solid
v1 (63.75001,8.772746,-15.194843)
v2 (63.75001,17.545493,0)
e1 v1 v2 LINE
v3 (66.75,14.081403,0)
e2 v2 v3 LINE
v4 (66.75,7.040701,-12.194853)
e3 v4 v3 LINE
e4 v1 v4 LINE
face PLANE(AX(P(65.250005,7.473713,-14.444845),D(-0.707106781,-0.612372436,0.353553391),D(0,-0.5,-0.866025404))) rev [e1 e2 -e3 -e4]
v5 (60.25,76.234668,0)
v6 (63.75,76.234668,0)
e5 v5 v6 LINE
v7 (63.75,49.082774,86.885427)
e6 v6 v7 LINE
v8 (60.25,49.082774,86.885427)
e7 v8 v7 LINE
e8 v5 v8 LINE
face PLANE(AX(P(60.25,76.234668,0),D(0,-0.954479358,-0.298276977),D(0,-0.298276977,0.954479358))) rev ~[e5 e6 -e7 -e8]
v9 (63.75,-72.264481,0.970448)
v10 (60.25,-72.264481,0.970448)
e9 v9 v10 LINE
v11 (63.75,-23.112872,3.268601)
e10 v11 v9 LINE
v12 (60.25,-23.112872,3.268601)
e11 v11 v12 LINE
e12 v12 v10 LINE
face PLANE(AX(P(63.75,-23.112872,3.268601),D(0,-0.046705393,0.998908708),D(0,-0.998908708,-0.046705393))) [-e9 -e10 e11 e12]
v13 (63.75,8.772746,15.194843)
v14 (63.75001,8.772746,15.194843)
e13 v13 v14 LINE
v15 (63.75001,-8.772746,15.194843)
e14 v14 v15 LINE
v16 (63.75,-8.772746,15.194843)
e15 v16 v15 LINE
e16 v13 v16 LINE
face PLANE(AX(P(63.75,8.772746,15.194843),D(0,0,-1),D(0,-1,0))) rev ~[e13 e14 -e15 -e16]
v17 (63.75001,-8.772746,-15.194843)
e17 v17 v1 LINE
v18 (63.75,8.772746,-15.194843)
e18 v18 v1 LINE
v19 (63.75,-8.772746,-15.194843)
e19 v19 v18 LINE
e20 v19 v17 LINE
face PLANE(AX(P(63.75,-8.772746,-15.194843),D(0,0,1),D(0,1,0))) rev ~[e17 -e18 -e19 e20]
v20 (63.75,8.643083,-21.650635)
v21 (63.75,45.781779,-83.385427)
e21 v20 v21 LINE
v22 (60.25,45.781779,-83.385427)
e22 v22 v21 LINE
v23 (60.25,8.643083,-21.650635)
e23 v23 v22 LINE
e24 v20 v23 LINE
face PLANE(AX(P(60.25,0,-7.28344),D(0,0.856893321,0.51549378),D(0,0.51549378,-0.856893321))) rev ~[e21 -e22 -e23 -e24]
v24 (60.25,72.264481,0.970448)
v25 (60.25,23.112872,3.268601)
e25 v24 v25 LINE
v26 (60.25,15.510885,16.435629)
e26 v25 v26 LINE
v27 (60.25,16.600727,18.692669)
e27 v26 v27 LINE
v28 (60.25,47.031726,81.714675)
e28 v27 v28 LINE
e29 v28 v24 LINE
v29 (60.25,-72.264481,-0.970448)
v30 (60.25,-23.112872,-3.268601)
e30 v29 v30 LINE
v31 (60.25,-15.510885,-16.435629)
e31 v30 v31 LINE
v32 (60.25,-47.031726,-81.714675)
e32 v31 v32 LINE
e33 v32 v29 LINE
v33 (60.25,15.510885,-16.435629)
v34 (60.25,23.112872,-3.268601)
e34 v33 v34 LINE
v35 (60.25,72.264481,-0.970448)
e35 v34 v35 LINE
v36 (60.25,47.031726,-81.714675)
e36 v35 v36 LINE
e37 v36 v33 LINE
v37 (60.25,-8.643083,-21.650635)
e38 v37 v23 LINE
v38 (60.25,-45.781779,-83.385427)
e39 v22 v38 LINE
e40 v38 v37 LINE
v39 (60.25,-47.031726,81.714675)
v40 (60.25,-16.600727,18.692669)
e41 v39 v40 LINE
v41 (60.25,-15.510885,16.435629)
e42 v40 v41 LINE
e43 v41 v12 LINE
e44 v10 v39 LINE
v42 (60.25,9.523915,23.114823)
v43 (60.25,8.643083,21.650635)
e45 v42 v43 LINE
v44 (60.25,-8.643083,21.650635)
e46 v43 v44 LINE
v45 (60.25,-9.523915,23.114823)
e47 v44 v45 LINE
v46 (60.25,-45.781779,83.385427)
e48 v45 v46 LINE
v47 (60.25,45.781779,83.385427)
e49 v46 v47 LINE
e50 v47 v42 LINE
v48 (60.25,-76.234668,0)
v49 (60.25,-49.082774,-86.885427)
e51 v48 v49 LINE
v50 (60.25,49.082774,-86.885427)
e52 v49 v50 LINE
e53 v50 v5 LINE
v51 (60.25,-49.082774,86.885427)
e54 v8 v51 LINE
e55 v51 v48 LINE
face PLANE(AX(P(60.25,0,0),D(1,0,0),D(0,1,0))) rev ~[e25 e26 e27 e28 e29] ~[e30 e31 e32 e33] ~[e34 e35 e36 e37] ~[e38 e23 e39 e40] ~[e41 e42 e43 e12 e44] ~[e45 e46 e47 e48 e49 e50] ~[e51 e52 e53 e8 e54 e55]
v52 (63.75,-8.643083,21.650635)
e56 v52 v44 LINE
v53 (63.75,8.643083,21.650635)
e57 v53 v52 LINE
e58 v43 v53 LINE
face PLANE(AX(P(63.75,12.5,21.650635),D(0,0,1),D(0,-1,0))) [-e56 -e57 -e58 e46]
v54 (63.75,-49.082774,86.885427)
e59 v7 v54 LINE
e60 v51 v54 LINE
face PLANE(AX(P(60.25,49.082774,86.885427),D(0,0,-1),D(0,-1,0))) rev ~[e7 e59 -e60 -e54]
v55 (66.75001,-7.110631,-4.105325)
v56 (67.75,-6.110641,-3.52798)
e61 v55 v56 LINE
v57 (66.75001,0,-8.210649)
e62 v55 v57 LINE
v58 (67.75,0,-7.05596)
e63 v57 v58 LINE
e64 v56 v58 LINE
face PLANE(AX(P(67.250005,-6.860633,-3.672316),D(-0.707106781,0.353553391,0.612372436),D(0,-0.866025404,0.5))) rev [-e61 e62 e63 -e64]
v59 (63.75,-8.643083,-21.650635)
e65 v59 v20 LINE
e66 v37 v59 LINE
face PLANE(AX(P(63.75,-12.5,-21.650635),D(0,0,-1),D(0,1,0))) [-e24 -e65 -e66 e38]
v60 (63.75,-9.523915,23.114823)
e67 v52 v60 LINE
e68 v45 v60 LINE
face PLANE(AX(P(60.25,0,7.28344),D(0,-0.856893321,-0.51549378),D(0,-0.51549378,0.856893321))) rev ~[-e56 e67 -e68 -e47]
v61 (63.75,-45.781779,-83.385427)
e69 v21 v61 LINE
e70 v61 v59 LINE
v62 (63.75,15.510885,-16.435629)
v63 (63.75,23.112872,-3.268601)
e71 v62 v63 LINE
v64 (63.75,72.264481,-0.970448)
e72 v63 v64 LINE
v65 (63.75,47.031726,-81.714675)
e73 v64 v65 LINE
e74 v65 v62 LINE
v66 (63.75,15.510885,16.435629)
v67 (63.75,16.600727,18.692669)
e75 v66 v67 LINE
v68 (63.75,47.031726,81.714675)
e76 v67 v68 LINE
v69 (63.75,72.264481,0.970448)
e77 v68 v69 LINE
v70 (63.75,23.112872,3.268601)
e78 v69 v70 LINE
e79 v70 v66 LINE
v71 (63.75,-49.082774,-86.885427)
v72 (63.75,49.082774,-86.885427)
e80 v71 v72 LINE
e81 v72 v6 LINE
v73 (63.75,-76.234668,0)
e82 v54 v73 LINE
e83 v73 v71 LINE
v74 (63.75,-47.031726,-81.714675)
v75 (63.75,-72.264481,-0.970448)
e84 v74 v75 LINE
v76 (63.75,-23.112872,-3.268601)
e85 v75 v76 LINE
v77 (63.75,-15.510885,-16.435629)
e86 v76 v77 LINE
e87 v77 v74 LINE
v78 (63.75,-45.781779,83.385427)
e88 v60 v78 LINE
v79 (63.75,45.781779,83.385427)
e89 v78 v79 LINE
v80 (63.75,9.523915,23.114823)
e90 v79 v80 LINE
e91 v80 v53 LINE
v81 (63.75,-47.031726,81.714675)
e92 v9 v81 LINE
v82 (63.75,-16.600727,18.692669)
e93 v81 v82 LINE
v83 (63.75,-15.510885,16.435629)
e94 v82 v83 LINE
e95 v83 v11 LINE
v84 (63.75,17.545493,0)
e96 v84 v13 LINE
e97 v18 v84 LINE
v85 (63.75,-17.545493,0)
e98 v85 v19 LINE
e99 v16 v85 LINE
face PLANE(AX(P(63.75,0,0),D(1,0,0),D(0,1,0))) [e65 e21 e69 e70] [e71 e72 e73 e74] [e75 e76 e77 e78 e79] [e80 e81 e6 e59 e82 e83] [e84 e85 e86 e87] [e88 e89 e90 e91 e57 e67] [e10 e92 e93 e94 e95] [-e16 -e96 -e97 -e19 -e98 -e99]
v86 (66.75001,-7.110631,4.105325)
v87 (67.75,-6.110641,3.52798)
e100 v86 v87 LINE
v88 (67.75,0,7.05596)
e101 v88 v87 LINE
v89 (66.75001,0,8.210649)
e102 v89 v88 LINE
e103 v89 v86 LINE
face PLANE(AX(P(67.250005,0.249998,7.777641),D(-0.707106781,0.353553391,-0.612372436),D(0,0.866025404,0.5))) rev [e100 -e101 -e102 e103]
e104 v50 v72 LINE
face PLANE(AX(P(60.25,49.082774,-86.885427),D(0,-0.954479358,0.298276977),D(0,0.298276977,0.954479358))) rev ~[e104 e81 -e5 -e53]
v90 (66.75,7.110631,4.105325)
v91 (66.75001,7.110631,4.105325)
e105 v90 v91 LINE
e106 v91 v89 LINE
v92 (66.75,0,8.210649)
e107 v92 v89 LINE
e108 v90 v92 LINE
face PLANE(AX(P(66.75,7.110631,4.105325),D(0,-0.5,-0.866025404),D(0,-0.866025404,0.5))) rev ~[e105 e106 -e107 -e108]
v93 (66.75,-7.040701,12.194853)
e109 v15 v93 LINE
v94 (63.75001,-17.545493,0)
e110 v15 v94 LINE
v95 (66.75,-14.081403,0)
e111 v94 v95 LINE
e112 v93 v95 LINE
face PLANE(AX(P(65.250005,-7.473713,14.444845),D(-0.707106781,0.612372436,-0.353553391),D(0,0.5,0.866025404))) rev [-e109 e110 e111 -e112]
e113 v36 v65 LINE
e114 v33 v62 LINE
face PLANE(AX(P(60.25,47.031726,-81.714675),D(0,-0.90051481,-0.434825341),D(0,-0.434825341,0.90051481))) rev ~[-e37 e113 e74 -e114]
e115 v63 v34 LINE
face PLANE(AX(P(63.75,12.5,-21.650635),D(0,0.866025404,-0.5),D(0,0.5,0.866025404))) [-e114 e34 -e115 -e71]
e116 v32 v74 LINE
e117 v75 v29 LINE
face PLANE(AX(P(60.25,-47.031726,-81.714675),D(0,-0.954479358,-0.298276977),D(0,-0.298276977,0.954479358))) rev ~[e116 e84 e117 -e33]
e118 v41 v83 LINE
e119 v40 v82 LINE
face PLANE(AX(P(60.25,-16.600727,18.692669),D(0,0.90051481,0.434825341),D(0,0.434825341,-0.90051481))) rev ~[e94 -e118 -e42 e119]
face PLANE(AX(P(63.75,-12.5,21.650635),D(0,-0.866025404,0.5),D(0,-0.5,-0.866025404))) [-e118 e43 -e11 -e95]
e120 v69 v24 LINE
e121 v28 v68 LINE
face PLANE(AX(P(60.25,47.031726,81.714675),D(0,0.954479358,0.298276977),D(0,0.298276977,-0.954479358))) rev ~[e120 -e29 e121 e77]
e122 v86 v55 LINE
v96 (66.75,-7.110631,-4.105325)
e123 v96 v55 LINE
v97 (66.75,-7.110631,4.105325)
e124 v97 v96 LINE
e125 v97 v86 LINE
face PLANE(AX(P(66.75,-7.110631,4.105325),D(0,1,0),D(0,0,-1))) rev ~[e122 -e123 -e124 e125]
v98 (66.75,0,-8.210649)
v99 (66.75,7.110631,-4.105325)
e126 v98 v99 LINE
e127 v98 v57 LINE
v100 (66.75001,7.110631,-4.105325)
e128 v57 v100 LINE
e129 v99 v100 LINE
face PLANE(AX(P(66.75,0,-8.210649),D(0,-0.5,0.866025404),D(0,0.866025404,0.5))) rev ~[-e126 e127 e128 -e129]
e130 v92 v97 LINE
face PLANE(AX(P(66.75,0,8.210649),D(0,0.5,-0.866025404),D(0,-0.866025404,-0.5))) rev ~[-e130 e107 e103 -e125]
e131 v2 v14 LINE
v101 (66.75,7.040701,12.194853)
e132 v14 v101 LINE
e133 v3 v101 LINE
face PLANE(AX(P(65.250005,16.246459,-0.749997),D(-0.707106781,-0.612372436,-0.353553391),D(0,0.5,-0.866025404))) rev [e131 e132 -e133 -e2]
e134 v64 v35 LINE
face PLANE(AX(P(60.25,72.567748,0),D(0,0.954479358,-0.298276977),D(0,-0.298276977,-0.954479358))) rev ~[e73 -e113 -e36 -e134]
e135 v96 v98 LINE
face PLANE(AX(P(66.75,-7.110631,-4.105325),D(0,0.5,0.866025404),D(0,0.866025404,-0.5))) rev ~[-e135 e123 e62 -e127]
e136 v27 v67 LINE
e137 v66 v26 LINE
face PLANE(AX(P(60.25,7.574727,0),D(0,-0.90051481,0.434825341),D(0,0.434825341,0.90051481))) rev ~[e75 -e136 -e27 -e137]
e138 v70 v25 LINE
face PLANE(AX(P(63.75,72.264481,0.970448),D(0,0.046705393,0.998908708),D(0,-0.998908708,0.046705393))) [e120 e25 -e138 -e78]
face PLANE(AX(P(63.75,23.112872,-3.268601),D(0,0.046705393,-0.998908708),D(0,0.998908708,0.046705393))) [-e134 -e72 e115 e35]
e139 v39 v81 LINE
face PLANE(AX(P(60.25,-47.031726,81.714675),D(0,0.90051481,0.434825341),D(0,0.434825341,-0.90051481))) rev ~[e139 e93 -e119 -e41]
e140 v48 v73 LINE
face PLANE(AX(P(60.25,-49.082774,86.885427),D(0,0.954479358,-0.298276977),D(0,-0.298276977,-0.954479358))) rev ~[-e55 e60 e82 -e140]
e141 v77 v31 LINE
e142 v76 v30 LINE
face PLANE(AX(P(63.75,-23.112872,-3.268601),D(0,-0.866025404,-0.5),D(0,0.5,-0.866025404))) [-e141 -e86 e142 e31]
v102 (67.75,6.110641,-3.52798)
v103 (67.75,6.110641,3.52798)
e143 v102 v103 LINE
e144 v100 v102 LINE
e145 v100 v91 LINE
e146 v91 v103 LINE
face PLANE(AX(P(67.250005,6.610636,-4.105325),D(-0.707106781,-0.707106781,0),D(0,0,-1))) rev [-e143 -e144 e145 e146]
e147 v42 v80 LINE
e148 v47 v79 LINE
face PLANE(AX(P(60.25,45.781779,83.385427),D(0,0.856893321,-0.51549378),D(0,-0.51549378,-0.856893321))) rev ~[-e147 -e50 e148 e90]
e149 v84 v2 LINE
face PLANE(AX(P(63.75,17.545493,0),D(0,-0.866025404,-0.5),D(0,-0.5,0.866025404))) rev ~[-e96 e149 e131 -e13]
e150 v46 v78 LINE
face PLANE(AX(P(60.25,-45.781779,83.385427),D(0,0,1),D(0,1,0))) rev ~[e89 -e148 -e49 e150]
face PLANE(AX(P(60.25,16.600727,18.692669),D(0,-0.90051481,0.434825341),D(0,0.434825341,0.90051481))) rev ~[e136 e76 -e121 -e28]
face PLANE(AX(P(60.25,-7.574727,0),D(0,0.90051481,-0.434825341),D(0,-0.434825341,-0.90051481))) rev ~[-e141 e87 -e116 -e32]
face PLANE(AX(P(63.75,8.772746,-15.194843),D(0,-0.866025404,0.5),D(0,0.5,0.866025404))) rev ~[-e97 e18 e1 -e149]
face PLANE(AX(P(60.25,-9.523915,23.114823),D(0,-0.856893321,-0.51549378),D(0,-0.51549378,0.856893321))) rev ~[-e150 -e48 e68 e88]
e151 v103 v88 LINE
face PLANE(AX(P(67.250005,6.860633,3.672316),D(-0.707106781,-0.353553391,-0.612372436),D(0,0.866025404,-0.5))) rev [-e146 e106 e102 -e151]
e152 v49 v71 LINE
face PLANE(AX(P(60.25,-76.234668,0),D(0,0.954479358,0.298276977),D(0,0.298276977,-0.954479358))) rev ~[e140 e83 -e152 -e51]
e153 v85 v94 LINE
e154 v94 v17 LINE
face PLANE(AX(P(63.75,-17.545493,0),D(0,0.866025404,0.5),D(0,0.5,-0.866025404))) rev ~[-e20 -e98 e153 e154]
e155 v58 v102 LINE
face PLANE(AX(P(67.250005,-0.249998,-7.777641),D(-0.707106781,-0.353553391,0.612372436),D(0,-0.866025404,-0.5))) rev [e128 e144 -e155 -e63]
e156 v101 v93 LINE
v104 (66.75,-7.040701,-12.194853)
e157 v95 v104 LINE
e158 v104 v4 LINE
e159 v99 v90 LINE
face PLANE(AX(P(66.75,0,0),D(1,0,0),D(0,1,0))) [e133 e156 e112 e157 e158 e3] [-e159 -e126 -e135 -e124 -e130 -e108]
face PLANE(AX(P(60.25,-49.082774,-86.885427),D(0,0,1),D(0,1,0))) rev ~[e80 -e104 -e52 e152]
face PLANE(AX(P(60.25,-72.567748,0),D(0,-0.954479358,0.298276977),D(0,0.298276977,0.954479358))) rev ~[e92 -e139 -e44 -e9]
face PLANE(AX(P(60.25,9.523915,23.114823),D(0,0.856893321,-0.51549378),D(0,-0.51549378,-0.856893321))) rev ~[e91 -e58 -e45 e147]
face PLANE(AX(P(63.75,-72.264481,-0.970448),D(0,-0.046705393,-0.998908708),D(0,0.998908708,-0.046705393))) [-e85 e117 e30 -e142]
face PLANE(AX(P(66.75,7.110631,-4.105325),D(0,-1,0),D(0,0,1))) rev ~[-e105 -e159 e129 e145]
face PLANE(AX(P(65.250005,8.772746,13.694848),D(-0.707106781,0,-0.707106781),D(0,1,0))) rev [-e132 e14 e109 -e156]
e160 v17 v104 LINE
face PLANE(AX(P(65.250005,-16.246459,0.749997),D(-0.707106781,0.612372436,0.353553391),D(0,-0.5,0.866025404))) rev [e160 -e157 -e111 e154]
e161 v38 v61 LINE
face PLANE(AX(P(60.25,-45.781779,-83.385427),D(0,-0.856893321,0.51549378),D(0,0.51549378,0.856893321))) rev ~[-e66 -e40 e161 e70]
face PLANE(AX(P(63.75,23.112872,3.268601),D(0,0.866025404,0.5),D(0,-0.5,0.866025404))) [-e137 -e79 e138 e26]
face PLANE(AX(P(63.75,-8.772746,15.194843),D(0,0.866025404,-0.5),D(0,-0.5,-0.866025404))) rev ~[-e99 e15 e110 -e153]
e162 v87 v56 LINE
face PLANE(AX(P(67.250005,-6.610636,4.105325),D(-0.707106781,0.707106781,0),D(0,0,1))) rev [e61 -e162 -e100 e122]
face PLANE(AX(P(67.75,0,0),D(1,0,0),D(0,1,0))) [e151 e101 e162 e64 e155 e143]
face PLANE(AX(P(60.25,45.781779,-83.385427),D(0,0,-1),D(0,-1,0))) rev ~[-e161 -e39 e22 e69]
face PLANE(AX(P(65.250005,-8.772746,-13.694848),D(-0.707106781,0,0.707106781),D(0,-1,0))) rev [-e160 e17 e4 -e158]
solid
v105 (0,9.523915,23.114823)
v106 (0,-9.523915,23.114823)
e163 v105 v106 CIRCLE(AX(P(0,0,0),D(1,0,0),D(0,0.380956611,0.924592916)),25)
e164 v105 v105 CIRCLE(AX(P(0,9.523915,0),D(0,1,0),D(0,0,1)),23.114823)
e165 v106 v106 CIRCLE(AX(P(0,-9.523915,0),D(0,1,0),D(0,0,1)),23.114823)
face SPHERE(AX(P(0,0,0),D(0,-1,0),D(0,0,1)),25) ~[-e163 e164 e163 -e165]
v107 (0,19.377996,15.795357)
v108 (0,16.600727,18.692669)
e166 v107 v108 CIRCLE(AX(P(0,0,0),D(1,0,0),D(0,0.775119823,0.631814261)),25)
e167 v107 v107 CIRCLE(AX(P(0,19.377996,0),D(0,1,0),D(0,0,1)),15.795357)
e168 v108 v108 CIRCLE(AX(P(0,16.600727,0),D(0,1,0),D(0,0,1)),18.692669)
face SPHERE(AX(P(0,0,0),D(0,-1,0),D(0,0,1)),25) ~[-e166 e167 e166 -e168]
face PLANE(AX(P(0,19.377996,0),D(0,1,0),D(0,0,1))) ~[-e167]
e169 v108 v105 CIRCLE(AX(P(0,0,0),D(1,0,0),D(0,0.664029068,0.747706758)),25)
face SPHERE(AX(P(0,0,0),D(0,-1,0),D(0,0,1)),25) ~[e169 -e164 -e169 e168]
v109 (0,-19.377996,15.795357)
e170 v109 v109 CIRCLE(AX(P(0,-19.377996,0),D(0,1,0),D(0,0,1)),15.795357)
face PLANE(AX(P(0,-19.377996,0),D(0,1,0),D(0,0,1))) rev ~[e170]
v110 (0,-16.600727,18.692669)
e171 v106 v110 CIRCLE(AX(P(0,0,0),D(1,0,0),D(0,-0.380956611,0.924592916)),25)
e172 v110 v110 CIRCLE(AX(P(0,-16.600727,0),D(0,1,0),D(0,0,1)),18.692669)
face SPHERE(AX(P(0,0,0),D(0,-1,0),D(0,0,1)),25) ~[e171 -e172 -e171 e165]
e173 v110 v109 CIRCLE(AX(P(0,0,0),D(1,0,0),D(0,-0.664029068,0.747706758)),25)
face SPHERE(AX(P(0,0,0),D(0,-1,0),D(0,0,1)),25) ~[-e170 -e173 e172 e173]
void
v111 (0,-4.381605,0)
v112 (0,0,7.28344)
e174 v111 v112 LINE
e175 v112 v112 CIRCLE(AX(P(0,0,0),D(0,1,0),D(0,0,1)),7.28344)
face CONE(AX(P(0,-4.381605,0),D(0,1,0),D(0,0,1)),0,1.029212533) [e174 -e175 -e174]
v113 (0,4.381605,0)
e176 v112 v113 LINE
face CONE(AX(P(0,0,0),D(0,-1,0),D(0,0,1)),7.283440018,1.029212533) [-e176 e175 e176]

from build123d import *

# Parameters (mm, degrees)
F2_START = 60.25
F2_DEPTH = 3.5
F4_DEPTH = 3.5
F6_DEPTH = 3
F7_SIZE  = 2.99999
F9_DEPTH = 1
F10_SIZE = 0.99999


# Not quite as in the source:
# - a fillet or chamfer is up to 0.001 mm smaller than in the source, because OpenCascade refuses the exact size
# - a feature names something its author has since deleted; it is built from what else it names


with BuildPart() as f1:
    # F0 (on Right) → F1 (revolve)
    with BuildSketch(Plane.YZ):
        with BuildLine():
            ThreePointArc((-16.6007267077, 18.6926689581), (-18.0475959302, 17.2998347143), (-19.3779955618, 15.795356533))
            Line((-19.3779955618, 15.795356533), (-19.3779955618, 0))
            Line((-19.3779955618, 0), (-7.5747272931, 0))
            Line((-7.5747272931, 0), (-16.6007267077, 18.6926689581))
        make_face()
        with BuildLine():
            ThreePointArc((-9.5239152868, 23.1148228981), (-13.2481353859, 21.2011063107), (-16.6007267077, 18.6926689581))
            Line((-16.6007267077, 18.6926689581), (-7.5747272931, 0))
            Line((-7.5747272931, 0), (-4.3816049583, 0))
            Line((-4.3816049583, 0), (0, 7.2834400177))
            Line((0, 7.2834400177), (-9.5239152868, 23.1148228981))
        make_face()
        with BuildLine():
            ThreePointArc((9.5239152868, 23.1148228981), (0, 25), (-9.5239152868, 23.1148228981))
            Line((-9.5239152868, 23.1148228981), (0, 7.2834400177))
            Line((0, 7.2834400177), (9.5239152868, 23.1148228981))
        make_face()
        with BuildLine():
            ThreePointArc((16.6007267077, 18.6926689581), (13.2481353859, 21.2011063107), (9.5239152868, 23.1148228981))
            Line((9.5239152868, 23.1148228981), (0, 7.2834400177))
            Line((0, 7.2834400177), (4.3816049583, 0))
            Line((4.3816049583, 0), (7.5747272931, 0))
            Line((7.5747272931, 0), (16.6007267077, 18.6926689581))
        make_face()
        with BuildLine():
            ThreePointArc((19.3779955618, 15.795356533), (18.0475959302, 17.2998347143), (16.6007267077, 18.6926689581))
            Line((16.6007267077, 18.6926689581), (7.5747272931, 0))
            Line((7.5747272931, 0), (19.3779955618, 0))
            Line((19.3779955618, 0), (19.3779955618, 15.795356533))
        make_face()
    revolve(axis=Axis((0, 9.6889977809, 0), (0, 1, 0)))


with BuildPart() as f2:
    # F0 (on Right) → F2 (new body)
    with BuildSketch(Plane.YZ.offset(F2_START)):
        Polygon((49.0827742896, 86.8854269893), (0, 86.8854269893), (-49.0827742896, 86.8854269893), (-76.2346684933, 0), (-49.0827742896, -86.8854269893), (0, -86.8854269893), (49.0827742896, -86.8854269893), (76.2346684933, 0), align=None)
        Polygon((-45.7817793022, -83.3854269893), (0, -7.2834400177), (45.7817793022, -83.3854269893), (0, -83.3854269893), align=None, mode=Mode.SUBTRACT)
        with BuildLine():
            Line((-47.0317255702, 81.7146747964), (-16.6007267077, 18.6926689581))
            ThreePointArc((-16.6007267077, 18.6926689581), (-13.2481353859, 21.2011063107), (-9.5239152868, 23.1148228981))
            Line((-9.5239152868, 23.1148228981), (-45.7817793022, 83.3854269893))
            Line((-45.7817793022, 83.3854269893), (0, 83.3854269893))
            Line((0, 83.3854269893), (45.7817793022, 83.3854269893))
            Line((45.7817793022, 83.3854269893), (9.5239152868, 23.1148228981))
            ThreePointArc((9.5239152868, 23.1148228981), (13.2481353859, 21.2011063107), (16.6007267077, 18.6926689581))
            Line((16.6007267077, 18.6926689581), (47.0317255702, 81.7146747964))
            Line((47.0317255702, 81.7146747964), (72.5677479141, 0))
            Line((72.5677479141, 0), (47.0317255702, -81.7146747964))
            Line((47.0317255702, -81.7146747964), (7.5747272931, 0))
            Line((7.5747272931, 0), (4.3816049583, 0))
            Line((4.3816049583, 0), (0, -7.2834400177))
            Line((0, -7.2834400177), (-4.3816049583, 0))
            Line((-4.3816049583, 0), (-7.5747272931, 0))
            Line((-7.5747272931, 0), (-47.0317255702, -81.7146747964))
            Line((-47.0317255702, -81.7146747964), (-72.5677479141, 0))
            Line((-72.5677479141, 0), (-47.0317255702, 81.7146747964))
        make_face(mode=Mode.SUBTRACT)
        with BuildLine():
            ThreePointArc((-9.5239152868, 23.1148228981), (-13.2481353859, 21.2011063107), (-16.6007267077, 18.6926689581))
            Line((-16.6007267077, 18.6926689581), (-7.5747272931, 0))
            Line((-7.5747272931, 0), (-4.3816049583, 0))
            Line((-4.3816049583, 0), (0, 7.2834400177))
            Line((0, 7.2834400177), (-9.5239152868, 23.1148228981))
        make_face()
        with BuildLine():
            ThreePointArc((16.6007267077, 18.6926689581), (13.2481353859, 21.2011063107), (9.5239152868, 23.1148228981))
            Line((9.5239152868, 23.1148228981), (0, 7.2834400177))
            Line((0, 7.2834400177), (4.3816049583, 0))
            Line((4.3816049583, 0), (7.5747272931, 0))
            Line((7.5747272931, 0), (16.6007267077, 18.6926689581))
        make_face()
        Polygon((0, 7.2834400177), (-4.3816049583, 0), (0, 0), (4.3816049583, 0), align=None)
        Polygon((0, 0), (-4.3816049583, 0), (0, -7.2834400177), (4.3816049583, 0), align=None)
    extrude(amount=F2_DEPTH)

    # F3 (on face) → F4 (join, through all)
    with BuildSketch(Plane.YZ.offset(63.75)):
        Polygon((23.1128721452, -3.2686013249), (25, 0), (23.1128721452, 3.2686013249), (0, 4.3492764235), (-23.1128721452, 3.2686013249), (-25, 0), (-23.1128721452, -3.2686013249), (0, -4.3492764235), align=None)
        Polygon((12.5, -21.6506350946), (23.1128721452, -3.2686013249), (0, -4.3492764235), (-23.1128721452, -3.2686013249), (-12.5, -21.6506350946), align=None)
        Polygon((0, 4.3492764235), (23.1128721452, 3.2686013249), (12.5, 21.6506350946), (-12.5, 21.6506350946), (-23.1128721452, 3.2686013249), align=None)
        Polygon((-72.2644806371, -0.9704481998), (-23.1128721452, -3.2686013249), (-25, 0), (-23.1128721452, 3.2686013249), (-72.2644806371, 0.9704481998), (-72.5677479141, 0), align=None)
        Polygon((23.1128721452, 3.2686013249), (25, 0), (23.1128721452, -3.2686013249), (72.2644806371, -0.9704481998), (72.5677479141, 0), (72.2644806371, 0.9704481998), align=None)
    extrude(amount=-F4_DEPTH)

    # F5 (on face) → F6 (join)
    with BuildSketch(Plane.YZ.offset(63.75)):
        Polygon((8.7727464607, 15.1948425919), (-8.7727464607, 15.1948425919), (-17.5454929214, 0), (-8.7727464607, -15.1948425919), (8.7727464607, -15.1948425919), (17.5454929214, 0), align=None)
    extrude(amount=F6_DEPTH)

    # F7 (size 3 in the source; OpenCascade refuses exactly that, so slightly less here)
    f7_edges = [f2.edges().sort_by_distance(p)[0] for p in [
        (66.75, -13.15912, 7.597421),
        (66.75, 0, 15.194843),
        (66.75, 13.15912, 7.597421),
        (66.75, 13.15912, -7.597421),
        (66.75, 0, -15.194843),
        (66.75, -13.15912, -7.597421),
    ]]
    chamfer(f7_edges, length=F7_SIZE)

    # F8 (on face) → F9 (join)
    with BuildSketch(Plane.YZ.offset(66.75)):
        Polygon((7.1106306277, -4.105324507), (7.1106306277, 4.105324507), (0, 8.210649014), (-7.1106306277, 4.105324507), (-7.1106306277, -4.105324507), (0, -8.210649014), align=None)
    extrude(amount=F9_DEPTH)

    # F10 (size 1 in the source; OpenCascade refuses exactly that, so slightly less here)
    f10_edges = [f2.edges().sort_by_distance(p)[0] for p in [
        (67.75, -3.555315, 6.157987),
        (67.75, 3.555315, 6.157987),
        (67.75, 7.110631, 0),
        (67.75, 3.555315, -6.157987),
        (67.75, -3.555315, -6.157987),
        (67.75, -7.110631, 0),
    ]]
    chamfer(f10_edges, length=F10_SIZE)


solid = Compound([f1.part, f2.part])
